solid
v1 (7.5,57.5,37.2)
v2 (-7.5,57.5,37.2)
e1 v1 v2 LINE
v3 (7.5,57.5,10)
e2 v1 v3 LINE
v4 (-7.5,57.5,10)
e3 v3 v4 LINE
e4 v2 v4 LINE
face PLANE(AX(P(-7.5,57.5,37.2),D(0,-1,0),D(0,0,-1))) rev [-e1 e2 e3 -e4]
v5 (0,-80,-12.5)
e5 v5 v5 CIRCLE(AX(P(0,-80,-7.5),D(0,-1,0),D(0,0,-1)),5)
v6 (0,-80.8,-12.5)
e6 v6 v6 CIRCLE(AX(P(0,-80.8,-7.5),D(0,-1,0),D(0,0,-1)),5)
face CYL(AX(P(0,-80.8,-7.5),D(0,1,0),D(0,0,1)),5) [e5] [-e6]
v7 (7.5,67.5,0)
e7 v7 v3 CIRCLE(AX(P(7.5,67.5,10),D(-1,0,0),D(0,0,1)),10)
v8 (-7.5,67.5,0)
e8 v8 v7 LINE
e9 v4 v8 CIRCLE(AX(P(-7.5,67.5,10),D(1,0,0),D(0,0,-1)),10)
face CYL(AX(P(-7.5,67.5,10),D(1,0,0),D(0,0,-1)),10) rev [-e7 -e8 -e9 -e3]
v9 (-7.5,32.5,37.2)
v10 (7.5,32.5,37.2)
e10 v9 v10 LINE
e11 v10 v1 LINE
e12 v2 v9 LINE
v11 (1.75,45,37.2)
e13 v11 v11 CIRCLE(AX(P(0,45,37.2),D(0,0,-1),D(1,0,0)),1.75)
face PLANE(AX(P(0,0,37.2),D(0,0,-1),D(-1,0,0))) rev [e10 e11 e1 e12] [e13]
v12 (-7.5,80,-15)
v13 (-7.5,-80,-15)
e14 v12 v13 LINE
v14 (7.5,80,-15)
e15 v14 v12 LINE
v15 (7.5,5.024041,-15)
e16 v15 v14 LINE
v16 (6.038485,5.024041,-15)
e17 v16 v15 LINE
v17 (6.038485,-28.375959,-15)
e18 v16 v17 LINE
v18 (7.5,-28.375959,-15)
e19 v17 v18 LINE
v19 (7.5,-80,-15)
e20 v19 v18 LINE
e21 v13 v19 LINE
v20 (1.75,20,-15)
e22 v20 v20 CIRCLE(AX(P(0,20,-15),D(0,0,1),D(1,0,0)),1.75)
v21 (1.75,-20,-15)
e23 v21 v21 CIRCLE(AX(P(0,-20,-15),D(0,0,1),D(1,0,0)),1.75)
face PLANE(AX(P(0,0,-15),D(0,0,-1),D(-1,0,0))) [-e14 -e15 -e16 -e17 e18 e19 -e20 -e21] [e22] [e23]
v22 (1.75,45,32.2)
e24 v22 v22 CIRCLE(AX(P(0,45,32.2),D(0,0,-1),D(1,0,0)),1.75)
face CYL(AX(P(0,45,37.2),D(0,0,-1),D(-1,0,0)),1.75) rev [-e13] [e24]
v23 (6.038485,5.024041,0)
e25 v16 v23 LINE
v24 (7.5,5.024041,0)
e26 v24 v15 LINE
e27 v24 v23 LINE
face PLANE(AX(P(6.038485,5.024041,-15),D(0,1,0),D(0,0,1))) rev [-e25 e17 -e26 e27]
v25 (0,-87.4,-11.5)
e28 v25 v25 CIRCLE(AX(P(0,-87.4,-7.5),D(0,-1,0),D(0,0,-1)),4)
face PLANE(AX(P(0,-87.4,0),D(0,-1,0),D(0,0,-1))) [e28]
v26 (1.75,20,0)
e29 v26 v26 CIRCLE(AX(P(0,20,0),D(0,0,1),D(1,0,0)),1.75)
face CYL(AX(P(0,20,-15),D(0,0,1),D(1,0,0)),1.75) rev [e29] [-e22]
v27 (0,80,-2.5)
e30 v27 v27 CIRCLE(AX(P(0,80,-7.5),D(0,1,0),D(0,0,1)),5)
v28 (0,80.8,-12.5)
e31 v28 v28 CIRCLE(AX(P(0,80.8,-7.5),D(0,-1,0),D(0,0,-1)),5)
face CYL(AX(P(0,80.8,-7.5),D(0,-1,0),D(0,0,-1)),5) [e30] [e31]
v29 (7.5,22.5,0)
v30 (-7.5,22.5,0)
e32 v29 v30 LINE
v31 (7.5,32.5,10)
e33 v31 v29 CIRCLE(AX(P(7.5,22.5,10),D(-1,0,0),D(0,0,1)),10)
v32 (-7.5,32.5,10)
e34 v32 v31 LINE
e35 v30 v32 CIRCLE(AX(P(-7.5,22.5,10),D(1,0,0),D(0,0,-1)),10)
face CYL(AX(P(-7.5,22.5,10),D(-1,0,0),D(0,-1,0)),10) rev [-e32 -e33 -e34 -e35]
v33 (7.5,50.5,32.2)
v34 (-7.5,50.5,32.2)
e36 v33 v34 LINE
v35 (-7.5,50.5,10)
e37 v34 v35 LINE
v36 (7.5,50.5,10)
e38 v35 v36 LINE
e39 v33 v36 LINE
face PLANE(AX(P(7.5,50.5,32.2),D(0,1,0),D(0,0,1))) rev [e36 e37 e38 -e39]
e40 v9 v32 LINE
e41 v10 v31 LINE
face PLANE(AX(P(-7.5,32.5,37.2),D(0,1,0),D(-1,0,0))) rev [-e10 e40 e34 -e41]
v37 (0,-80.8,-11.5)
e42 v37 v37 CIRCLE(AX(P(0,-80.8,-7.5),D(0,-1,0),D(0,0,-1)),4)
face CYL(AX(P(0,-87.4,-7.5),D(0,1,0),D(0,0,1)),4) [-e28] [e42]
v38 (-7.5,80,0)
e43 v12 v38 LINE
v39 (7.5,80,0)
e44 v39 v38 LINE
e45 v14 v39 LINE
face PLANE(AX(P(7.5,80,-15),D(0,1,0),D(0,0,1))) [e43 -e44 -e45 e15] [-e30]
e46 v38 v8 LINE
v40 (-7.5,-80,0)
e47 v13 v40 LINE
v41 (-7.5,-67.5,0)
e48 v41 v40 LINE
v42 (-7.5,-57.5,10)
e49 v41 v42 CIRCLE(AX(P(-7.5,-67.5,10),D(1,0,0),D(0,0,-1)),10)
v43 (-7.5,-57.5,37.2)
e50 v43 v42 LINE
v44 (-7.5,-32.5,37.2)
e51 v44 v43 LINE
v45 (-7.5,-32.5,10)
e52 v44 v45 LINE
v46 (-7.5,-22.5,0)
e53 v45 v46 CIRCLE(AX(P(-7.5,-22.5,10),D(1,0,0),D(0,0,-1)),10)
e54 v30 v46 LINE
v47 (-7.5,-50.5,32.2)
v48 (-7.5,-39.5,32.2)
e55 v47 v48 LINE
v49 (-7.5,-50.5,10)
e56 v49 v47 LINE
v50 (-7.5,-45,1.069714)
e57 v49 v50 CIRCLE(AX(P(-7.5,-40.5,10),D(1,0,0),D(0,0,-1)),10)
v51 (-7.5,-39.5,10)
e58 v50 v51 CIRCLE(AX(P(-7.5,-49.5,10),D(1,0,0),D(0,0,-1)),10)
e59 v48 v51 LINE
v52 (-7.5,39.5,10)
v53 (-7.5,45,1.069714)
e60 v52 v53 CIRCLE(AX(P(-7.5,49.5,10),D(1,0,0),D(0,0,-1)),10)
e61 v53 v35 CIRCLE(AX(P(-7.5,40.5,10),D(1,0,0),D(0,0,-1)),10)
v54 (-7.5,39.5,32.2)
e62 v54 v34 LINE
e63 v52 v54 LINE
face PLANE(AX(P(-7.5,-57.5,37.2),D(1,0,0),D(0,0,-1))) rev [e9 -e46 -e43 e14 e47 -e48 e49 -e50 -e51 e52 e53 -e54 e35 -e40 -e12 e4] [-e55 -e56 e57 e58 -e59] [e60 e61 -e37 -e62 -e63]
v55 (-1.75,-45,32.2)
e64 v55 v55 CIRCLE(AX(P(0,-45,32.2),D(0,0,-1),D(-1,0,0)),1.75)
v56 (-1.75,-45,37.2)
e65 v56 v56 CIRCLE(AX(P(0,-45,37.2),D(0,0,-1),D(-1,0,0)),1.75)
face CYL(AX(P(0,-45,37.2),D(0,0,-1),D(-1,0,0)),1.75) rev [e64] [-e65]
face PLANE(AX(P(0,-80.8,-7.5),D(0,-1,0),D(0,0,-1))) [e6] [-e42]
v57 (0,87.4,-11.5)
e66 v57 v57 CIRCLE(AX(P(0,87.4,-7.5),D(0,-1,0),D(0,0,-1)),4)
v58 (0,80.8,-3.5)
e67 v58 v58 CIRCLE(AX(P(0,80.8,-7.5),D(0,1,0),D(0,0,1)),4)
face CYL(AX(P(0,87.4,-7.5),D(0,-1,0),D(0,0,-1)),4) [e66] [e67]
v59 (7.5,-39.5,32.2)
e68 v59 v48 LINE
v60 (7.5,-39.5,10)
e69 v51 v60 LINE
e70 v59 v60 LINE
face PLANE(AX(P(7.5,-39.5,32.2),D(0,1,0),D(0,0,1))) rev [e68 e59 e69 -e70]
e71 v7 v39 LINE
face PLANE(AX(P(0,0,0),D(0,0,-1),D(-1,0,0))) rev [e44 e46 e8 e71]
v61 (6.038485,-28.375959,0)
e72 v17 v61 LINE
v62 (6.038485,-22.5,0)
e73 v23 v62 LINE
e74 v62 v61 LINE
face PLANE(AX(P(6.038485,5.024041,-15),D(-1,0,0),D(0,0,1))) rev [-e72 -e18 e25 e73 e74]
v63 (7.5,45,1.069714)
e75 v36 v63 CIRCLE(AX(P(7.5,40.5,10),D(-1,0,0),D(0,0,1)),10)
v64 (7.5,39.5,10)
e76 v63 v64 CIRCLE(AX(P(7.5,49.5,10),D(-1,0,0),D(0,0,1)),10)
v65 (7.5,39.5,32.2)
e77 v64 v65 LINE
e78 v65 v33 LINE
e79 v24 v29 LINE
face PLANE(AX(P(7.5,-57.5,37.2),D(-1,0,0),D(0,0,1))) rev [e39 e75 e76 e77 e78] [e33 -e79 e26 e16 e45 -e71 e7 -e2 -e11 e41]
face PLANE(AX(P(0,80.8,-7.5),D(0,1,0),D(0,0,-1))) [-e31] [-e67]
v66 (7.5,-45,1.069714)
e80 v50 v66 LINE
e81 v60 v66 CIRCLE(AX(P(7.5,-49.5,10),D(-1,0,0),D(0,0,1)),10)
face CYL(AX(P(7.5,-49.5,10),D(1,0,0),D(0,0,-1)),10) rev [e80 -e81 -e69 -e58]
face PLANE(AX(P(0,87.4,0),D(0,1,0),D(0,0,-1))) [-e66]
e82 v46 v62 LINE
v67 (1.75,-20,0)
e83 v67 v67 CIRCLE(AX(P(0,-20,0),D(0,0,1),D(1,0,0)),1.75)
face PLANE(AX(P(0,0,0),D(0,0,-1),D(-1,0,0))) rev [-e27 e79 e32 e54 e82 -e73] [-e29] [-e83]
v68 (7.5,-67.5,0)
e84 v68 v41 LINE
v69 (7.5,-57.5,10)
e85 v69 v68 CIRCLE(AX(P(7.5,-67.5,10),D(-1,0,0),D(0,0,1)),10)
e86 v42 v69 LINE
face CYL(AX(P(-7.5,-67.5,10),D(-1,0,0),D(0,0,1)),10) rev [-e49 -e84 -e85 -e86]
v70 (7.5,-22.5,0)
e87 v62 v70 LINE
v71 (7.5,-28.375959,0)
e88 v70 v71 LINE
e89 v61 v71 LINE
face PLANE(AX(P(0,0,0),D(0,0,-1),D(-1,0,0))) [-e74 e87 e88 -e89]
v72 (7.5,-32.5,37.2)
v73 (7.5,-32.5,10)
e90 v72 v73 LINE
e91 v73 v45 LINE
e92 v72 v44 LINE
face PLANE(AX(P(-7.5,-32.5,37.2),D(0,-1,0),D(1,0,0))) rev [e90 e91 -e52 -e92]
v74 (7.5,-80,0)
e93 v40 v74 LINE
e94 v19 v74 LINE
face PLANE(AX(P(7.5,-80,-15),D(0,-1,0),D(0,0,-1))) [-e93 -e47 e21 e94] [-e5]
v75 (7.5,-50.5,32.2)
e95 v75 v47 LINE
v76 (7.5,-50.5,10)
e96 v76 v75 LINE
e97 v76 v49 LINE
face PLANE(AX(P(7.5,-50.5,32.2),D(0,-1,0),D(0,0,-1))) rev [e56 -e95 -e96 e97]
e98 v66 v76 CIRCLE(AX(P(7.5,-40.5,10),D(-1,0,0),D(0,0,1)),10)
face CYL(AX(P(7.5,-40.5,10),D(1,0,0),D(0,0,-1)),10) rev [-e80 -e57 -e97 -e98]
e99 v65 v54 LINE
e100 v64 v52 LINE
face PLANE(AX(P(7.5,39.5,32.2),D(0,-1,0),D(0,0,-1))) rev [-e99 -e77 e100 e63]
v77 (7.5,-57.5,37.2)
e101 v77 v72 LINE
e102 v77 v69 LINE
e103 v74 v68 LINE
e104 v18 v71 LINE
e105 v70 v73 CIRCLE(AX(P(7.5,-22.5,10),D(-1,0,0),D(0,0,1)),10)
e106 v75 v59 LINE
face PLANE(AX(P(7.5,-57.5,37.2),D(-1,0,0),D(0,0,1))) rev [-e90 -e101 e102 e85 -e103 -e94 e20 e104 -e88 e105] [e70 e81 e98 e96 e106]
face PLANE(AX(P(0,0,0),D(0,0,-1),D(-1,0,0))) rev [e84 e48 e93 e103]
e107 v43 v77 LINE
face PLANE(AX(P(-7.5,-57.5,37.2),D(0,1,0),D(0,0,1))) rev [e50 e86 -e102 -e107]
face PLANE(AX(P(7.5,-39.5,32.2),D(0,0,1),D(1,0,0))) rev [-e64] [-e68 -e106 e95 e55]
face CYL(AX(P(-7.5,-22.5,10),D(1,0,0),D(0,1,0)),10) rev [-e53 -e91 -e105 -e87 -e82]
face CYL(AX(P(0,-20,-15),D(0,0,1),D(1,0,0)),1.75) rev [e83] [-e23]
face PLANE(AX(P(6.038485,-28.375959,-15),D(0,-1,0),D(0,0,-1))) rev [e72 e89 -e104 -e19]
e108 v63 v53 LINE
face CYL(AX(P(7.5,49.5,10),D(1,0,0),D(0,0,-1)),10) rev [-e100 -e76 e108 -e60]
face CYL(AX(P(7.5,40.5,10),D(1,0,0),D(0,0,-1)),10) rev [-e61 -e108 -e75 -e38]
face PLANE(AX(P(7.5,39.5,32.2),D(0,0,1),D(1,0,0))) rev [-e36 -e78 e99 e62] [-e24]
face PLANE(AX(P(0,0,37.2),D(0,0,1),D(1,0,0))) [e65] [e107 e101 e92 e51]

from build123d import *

# Parameters (mm, degrees)
ESQUISSE1_W                      = 25
ESQUISSE1_H                      = 15
BOSS_EXTRU_1_DEPTH               = 37.2
BOSS_EXTRU_1_2_DEPTH             = 37.2
ESQUISSE3_W                      = 160
ESQUISSE3_H                      = 15
BOSS_EXTRU_2_DEPTH               = 15
ESQUISSE4_R                      = 5
ESQUISSE4_R_2                    = 4
BOSS_EXTRU_5_DEPTH               = 0.8
ESQUISSE4_6_R                    = 4
BOSS_EXTRU_6_DEPTH               = 7.4
CONG_1_R                         = 10
ESQUISSE5_W                      = 11
ESQUISSE5_H                      = 32.2
ENL_V_MAT_EXTRU_1_DEPTH          = 97.164442493
CONG_2_R                         = 10
ESQUISSE6_R                      = 1.75
ENL_V_MAT_EXTRU_2_DEPTH          = 100.613503101
ESQUISSE11_R                     = 1.75
TROUS_VIS_SUPPORT_CAPTEURS_DEPTH = 96.282999533
ESQUISSE12_W                     = 33.4
ESQUISSE12_H                     = 4.7
ENCOCHE_CARTE_CAPTEUR_DEPTH      = 96.282999533


with BuildPart() as part:
    # Esquisse1 → Boss.-Extru.1 (new body)
    with BuildSketch(Plane(origin=(0, 0, 0), x_dir=(0, 1, 0), z_dir=(0, 0, 1))):
        with Locations((-45, 0)):
            Rectangle(ESQUISSE1_W, ESQUISSE1_H)
    extrude(amount=BOSS_EXTRU_1_DEPTH)



with BuildPart() as body_2:
    # Esquisse1 → Boss.-Extru.1 2 (new body)
    with BuildSketch(Plane(origin=(0, 0, 0), x_dir=(0, 1, 0), z_dir=(0, 0, 1))):
        with Locations((45, 0)):
            Rectangle(ESQUISSE1_W, ESQUISSE1_H)
    extrude(amount=BOSS_EXTRU_1_2_DEPTH)


with BuildPart() as part_1:
    add(part.part)

    add(body_2.part)  # Boss.-Extru.2 merges body 2
    # Esquisse3 → Boss.-Extru.2 (add)
    with BuildSketch(Plane(origin=(0, 0, 0), x_dir=(0, 1, 0), z_dir=(0, 0, 1))):
        Rectangle(ESQUISSE3_W, ESQUISSE3_H)
    extrude(amount=-BOSS_EXTRU_2_DEPTH)

    # Esquisse4 → Boss.-Extru.5 (add)
    with BuildSketch(Plane(origin=(0, -80, 0), x_dir=(-1, 0, 0), z_dir=(0, -1, 0))):
        with Locations(Location((0, 7.5, 0), (0, 0, 90))):
            Circle(ESQUISSE4_R)
        with Locations(Location((0, 7.5, 0), (0, 0, 90))):
            Circle(ESQUISSE4_R_2, mode=Mode.SUBTRACT)
    boss_extru_5 = extrude(amount=BOSS_EXTRU_5_DEPTH)

    # Esquisse4<6> → Boss.-Extru.6 (add)
    with BuildSketch(Plane(origin=(0, -80, 0), x_dir=(-1, 0, 0), z_dir=(0, -1, 0))):
        with Locations(Location((0, 7.5, 0), (0, 0, 90))):
            Circle(ESQUISSE4_6_R)
    boss_extru_6 = extrude(amount=BOSS_EXTRU_6_DEPTH)

    # Symétrie2: Boss.-Extru.5, Boss.-Extru.6 across plane
    add(boss_extru_5.mirror(Plane.ZX))
    add(boss_extru_6.mirror(Plane.ZX))

    # Congé1
    cong_1_edges = [part_1.edges().sort_by_distance(p)[0] for p in [
        (0, 57.5, 0),
        (0, 32.5, 0),
        (0, -57.5, 0),
        (0, -32.5, 0),
    ]]
    fillet(cong_1_edges, radius=CONG_1_R)

    # Esquisse5 → Enlèv. mat.-Extru.1 (cut, through all)
    with BuildSketch(Plane(origin=(-7.5, 0, 0), x_dir=(0, -1, 0), z_dir=(-1, 0, 0))):
        with Locations((45, 16.1)):
            Rectangle(ESQUISSE5_W, ESQUISSE5_H)
        with Locations((-45, 16.1)):
            Rectangle(ESQUISSE5_W, ESQUISSE5_H)
    extrude(amount=-ENL_V_MAT_EXTRU_1_DEPTH, mode=Mode.SUBTRACT)

    # Congé2
    # the kernel refuses this fillet: 10 mm, written as the material it adds along each edge
    with BuildSketch(Plane(origin=(-7.5, 39.5, 0), x_dir=(0, 0, 1), z_dir=(1, 0, 0)), Plane(origin=(-7.5, -39.5, 0), x_dir=(0, -1, 0), z_dir=(1, 0, 0)), Plane(origin=(-7.5, -50.5, 0), x_dir=(0, 0, 1), z_dir=(1, 0, 0))) as cong_2_piece_1:
        with BuildLine():
            CenterArc((CONG_2_R, -CONG_2_R), CONG_2_R, 90, 90)
            Line((0, -CONG_2_R), (0, 0))
            Line((0, 0), (CONG_2_R, 0))
        make_face()
    extrude(amount=15)
    with BuildSketch(Plane(origin=(-7.5, 50.5, 0), x_dir=(0, 0, 1), z_dir=(1, 0, 0))) as cong_2_piece_2:
        with BuildLine():
            CenterArc((CONG_2_R, CONG_2_R), CONG_2_R, 180, 90)
            Line((0, CONG_2_R), (0, 0))
            Line((0, 0), (CONG_2_R, 0))
        make_face()
    extrude(amount=15)

    # Esquisse6 → Enlèv. mat.-Extru.2 (cut, through all)
    with BuildSketch(Plane(origin=(0, 0, 32.2), x_dir=(1, 0, 0), z_dir=(0, 0, -1))):
        with Locations(Location((0, 45, 0), (0, 0, 180))):
            Circle(ESQUISSE6_R)
        with Locations((0, -45)):
            Circle(ESQUISSE6_R)
    extrude(amount=-ENL_V_MAT_EXTRU_2_DEPTH, mode=Mode.SUBTRACT)

    # Esquisse11 → Trous vis support capteurs (cut, through all)
    with BuildSketch(Plane(origin=(0, 0, 0), x_dir=(0, 1, 0), z_dir=(0, 0, 1))):
        with Locations(Location((20, 0, 0), (0, 0, 270))):
            Circle(ESQUISSE11_R)
        with Locations(Location((-20, 0, 0), (0, 0, 270))):
            Circle(ESQUISSE11_R)
    extrude(amount=-TROUS_VIS_SUPPORT_CAPTEURS_DEPTH, mode=Mode.SUBTRACT)

    # Esquisse12 → Encoche carte capteur (cut, through all)
    with BuildSketch(Plane(origin=(0, 0, 0), x_dir=(0, 1, 0), z_dir=(0, 0, 1))):
        with Locations((-11.675958981, -8.388484641)):
            Rectangle(ESQUISSE12_W, ESQUISSE12_H)
    extrude(amount=-ENCOCHE_CARTE_CAPTEUR_DEPTH, mode=Mode.SUBTRACT)


solid = part_1.part
